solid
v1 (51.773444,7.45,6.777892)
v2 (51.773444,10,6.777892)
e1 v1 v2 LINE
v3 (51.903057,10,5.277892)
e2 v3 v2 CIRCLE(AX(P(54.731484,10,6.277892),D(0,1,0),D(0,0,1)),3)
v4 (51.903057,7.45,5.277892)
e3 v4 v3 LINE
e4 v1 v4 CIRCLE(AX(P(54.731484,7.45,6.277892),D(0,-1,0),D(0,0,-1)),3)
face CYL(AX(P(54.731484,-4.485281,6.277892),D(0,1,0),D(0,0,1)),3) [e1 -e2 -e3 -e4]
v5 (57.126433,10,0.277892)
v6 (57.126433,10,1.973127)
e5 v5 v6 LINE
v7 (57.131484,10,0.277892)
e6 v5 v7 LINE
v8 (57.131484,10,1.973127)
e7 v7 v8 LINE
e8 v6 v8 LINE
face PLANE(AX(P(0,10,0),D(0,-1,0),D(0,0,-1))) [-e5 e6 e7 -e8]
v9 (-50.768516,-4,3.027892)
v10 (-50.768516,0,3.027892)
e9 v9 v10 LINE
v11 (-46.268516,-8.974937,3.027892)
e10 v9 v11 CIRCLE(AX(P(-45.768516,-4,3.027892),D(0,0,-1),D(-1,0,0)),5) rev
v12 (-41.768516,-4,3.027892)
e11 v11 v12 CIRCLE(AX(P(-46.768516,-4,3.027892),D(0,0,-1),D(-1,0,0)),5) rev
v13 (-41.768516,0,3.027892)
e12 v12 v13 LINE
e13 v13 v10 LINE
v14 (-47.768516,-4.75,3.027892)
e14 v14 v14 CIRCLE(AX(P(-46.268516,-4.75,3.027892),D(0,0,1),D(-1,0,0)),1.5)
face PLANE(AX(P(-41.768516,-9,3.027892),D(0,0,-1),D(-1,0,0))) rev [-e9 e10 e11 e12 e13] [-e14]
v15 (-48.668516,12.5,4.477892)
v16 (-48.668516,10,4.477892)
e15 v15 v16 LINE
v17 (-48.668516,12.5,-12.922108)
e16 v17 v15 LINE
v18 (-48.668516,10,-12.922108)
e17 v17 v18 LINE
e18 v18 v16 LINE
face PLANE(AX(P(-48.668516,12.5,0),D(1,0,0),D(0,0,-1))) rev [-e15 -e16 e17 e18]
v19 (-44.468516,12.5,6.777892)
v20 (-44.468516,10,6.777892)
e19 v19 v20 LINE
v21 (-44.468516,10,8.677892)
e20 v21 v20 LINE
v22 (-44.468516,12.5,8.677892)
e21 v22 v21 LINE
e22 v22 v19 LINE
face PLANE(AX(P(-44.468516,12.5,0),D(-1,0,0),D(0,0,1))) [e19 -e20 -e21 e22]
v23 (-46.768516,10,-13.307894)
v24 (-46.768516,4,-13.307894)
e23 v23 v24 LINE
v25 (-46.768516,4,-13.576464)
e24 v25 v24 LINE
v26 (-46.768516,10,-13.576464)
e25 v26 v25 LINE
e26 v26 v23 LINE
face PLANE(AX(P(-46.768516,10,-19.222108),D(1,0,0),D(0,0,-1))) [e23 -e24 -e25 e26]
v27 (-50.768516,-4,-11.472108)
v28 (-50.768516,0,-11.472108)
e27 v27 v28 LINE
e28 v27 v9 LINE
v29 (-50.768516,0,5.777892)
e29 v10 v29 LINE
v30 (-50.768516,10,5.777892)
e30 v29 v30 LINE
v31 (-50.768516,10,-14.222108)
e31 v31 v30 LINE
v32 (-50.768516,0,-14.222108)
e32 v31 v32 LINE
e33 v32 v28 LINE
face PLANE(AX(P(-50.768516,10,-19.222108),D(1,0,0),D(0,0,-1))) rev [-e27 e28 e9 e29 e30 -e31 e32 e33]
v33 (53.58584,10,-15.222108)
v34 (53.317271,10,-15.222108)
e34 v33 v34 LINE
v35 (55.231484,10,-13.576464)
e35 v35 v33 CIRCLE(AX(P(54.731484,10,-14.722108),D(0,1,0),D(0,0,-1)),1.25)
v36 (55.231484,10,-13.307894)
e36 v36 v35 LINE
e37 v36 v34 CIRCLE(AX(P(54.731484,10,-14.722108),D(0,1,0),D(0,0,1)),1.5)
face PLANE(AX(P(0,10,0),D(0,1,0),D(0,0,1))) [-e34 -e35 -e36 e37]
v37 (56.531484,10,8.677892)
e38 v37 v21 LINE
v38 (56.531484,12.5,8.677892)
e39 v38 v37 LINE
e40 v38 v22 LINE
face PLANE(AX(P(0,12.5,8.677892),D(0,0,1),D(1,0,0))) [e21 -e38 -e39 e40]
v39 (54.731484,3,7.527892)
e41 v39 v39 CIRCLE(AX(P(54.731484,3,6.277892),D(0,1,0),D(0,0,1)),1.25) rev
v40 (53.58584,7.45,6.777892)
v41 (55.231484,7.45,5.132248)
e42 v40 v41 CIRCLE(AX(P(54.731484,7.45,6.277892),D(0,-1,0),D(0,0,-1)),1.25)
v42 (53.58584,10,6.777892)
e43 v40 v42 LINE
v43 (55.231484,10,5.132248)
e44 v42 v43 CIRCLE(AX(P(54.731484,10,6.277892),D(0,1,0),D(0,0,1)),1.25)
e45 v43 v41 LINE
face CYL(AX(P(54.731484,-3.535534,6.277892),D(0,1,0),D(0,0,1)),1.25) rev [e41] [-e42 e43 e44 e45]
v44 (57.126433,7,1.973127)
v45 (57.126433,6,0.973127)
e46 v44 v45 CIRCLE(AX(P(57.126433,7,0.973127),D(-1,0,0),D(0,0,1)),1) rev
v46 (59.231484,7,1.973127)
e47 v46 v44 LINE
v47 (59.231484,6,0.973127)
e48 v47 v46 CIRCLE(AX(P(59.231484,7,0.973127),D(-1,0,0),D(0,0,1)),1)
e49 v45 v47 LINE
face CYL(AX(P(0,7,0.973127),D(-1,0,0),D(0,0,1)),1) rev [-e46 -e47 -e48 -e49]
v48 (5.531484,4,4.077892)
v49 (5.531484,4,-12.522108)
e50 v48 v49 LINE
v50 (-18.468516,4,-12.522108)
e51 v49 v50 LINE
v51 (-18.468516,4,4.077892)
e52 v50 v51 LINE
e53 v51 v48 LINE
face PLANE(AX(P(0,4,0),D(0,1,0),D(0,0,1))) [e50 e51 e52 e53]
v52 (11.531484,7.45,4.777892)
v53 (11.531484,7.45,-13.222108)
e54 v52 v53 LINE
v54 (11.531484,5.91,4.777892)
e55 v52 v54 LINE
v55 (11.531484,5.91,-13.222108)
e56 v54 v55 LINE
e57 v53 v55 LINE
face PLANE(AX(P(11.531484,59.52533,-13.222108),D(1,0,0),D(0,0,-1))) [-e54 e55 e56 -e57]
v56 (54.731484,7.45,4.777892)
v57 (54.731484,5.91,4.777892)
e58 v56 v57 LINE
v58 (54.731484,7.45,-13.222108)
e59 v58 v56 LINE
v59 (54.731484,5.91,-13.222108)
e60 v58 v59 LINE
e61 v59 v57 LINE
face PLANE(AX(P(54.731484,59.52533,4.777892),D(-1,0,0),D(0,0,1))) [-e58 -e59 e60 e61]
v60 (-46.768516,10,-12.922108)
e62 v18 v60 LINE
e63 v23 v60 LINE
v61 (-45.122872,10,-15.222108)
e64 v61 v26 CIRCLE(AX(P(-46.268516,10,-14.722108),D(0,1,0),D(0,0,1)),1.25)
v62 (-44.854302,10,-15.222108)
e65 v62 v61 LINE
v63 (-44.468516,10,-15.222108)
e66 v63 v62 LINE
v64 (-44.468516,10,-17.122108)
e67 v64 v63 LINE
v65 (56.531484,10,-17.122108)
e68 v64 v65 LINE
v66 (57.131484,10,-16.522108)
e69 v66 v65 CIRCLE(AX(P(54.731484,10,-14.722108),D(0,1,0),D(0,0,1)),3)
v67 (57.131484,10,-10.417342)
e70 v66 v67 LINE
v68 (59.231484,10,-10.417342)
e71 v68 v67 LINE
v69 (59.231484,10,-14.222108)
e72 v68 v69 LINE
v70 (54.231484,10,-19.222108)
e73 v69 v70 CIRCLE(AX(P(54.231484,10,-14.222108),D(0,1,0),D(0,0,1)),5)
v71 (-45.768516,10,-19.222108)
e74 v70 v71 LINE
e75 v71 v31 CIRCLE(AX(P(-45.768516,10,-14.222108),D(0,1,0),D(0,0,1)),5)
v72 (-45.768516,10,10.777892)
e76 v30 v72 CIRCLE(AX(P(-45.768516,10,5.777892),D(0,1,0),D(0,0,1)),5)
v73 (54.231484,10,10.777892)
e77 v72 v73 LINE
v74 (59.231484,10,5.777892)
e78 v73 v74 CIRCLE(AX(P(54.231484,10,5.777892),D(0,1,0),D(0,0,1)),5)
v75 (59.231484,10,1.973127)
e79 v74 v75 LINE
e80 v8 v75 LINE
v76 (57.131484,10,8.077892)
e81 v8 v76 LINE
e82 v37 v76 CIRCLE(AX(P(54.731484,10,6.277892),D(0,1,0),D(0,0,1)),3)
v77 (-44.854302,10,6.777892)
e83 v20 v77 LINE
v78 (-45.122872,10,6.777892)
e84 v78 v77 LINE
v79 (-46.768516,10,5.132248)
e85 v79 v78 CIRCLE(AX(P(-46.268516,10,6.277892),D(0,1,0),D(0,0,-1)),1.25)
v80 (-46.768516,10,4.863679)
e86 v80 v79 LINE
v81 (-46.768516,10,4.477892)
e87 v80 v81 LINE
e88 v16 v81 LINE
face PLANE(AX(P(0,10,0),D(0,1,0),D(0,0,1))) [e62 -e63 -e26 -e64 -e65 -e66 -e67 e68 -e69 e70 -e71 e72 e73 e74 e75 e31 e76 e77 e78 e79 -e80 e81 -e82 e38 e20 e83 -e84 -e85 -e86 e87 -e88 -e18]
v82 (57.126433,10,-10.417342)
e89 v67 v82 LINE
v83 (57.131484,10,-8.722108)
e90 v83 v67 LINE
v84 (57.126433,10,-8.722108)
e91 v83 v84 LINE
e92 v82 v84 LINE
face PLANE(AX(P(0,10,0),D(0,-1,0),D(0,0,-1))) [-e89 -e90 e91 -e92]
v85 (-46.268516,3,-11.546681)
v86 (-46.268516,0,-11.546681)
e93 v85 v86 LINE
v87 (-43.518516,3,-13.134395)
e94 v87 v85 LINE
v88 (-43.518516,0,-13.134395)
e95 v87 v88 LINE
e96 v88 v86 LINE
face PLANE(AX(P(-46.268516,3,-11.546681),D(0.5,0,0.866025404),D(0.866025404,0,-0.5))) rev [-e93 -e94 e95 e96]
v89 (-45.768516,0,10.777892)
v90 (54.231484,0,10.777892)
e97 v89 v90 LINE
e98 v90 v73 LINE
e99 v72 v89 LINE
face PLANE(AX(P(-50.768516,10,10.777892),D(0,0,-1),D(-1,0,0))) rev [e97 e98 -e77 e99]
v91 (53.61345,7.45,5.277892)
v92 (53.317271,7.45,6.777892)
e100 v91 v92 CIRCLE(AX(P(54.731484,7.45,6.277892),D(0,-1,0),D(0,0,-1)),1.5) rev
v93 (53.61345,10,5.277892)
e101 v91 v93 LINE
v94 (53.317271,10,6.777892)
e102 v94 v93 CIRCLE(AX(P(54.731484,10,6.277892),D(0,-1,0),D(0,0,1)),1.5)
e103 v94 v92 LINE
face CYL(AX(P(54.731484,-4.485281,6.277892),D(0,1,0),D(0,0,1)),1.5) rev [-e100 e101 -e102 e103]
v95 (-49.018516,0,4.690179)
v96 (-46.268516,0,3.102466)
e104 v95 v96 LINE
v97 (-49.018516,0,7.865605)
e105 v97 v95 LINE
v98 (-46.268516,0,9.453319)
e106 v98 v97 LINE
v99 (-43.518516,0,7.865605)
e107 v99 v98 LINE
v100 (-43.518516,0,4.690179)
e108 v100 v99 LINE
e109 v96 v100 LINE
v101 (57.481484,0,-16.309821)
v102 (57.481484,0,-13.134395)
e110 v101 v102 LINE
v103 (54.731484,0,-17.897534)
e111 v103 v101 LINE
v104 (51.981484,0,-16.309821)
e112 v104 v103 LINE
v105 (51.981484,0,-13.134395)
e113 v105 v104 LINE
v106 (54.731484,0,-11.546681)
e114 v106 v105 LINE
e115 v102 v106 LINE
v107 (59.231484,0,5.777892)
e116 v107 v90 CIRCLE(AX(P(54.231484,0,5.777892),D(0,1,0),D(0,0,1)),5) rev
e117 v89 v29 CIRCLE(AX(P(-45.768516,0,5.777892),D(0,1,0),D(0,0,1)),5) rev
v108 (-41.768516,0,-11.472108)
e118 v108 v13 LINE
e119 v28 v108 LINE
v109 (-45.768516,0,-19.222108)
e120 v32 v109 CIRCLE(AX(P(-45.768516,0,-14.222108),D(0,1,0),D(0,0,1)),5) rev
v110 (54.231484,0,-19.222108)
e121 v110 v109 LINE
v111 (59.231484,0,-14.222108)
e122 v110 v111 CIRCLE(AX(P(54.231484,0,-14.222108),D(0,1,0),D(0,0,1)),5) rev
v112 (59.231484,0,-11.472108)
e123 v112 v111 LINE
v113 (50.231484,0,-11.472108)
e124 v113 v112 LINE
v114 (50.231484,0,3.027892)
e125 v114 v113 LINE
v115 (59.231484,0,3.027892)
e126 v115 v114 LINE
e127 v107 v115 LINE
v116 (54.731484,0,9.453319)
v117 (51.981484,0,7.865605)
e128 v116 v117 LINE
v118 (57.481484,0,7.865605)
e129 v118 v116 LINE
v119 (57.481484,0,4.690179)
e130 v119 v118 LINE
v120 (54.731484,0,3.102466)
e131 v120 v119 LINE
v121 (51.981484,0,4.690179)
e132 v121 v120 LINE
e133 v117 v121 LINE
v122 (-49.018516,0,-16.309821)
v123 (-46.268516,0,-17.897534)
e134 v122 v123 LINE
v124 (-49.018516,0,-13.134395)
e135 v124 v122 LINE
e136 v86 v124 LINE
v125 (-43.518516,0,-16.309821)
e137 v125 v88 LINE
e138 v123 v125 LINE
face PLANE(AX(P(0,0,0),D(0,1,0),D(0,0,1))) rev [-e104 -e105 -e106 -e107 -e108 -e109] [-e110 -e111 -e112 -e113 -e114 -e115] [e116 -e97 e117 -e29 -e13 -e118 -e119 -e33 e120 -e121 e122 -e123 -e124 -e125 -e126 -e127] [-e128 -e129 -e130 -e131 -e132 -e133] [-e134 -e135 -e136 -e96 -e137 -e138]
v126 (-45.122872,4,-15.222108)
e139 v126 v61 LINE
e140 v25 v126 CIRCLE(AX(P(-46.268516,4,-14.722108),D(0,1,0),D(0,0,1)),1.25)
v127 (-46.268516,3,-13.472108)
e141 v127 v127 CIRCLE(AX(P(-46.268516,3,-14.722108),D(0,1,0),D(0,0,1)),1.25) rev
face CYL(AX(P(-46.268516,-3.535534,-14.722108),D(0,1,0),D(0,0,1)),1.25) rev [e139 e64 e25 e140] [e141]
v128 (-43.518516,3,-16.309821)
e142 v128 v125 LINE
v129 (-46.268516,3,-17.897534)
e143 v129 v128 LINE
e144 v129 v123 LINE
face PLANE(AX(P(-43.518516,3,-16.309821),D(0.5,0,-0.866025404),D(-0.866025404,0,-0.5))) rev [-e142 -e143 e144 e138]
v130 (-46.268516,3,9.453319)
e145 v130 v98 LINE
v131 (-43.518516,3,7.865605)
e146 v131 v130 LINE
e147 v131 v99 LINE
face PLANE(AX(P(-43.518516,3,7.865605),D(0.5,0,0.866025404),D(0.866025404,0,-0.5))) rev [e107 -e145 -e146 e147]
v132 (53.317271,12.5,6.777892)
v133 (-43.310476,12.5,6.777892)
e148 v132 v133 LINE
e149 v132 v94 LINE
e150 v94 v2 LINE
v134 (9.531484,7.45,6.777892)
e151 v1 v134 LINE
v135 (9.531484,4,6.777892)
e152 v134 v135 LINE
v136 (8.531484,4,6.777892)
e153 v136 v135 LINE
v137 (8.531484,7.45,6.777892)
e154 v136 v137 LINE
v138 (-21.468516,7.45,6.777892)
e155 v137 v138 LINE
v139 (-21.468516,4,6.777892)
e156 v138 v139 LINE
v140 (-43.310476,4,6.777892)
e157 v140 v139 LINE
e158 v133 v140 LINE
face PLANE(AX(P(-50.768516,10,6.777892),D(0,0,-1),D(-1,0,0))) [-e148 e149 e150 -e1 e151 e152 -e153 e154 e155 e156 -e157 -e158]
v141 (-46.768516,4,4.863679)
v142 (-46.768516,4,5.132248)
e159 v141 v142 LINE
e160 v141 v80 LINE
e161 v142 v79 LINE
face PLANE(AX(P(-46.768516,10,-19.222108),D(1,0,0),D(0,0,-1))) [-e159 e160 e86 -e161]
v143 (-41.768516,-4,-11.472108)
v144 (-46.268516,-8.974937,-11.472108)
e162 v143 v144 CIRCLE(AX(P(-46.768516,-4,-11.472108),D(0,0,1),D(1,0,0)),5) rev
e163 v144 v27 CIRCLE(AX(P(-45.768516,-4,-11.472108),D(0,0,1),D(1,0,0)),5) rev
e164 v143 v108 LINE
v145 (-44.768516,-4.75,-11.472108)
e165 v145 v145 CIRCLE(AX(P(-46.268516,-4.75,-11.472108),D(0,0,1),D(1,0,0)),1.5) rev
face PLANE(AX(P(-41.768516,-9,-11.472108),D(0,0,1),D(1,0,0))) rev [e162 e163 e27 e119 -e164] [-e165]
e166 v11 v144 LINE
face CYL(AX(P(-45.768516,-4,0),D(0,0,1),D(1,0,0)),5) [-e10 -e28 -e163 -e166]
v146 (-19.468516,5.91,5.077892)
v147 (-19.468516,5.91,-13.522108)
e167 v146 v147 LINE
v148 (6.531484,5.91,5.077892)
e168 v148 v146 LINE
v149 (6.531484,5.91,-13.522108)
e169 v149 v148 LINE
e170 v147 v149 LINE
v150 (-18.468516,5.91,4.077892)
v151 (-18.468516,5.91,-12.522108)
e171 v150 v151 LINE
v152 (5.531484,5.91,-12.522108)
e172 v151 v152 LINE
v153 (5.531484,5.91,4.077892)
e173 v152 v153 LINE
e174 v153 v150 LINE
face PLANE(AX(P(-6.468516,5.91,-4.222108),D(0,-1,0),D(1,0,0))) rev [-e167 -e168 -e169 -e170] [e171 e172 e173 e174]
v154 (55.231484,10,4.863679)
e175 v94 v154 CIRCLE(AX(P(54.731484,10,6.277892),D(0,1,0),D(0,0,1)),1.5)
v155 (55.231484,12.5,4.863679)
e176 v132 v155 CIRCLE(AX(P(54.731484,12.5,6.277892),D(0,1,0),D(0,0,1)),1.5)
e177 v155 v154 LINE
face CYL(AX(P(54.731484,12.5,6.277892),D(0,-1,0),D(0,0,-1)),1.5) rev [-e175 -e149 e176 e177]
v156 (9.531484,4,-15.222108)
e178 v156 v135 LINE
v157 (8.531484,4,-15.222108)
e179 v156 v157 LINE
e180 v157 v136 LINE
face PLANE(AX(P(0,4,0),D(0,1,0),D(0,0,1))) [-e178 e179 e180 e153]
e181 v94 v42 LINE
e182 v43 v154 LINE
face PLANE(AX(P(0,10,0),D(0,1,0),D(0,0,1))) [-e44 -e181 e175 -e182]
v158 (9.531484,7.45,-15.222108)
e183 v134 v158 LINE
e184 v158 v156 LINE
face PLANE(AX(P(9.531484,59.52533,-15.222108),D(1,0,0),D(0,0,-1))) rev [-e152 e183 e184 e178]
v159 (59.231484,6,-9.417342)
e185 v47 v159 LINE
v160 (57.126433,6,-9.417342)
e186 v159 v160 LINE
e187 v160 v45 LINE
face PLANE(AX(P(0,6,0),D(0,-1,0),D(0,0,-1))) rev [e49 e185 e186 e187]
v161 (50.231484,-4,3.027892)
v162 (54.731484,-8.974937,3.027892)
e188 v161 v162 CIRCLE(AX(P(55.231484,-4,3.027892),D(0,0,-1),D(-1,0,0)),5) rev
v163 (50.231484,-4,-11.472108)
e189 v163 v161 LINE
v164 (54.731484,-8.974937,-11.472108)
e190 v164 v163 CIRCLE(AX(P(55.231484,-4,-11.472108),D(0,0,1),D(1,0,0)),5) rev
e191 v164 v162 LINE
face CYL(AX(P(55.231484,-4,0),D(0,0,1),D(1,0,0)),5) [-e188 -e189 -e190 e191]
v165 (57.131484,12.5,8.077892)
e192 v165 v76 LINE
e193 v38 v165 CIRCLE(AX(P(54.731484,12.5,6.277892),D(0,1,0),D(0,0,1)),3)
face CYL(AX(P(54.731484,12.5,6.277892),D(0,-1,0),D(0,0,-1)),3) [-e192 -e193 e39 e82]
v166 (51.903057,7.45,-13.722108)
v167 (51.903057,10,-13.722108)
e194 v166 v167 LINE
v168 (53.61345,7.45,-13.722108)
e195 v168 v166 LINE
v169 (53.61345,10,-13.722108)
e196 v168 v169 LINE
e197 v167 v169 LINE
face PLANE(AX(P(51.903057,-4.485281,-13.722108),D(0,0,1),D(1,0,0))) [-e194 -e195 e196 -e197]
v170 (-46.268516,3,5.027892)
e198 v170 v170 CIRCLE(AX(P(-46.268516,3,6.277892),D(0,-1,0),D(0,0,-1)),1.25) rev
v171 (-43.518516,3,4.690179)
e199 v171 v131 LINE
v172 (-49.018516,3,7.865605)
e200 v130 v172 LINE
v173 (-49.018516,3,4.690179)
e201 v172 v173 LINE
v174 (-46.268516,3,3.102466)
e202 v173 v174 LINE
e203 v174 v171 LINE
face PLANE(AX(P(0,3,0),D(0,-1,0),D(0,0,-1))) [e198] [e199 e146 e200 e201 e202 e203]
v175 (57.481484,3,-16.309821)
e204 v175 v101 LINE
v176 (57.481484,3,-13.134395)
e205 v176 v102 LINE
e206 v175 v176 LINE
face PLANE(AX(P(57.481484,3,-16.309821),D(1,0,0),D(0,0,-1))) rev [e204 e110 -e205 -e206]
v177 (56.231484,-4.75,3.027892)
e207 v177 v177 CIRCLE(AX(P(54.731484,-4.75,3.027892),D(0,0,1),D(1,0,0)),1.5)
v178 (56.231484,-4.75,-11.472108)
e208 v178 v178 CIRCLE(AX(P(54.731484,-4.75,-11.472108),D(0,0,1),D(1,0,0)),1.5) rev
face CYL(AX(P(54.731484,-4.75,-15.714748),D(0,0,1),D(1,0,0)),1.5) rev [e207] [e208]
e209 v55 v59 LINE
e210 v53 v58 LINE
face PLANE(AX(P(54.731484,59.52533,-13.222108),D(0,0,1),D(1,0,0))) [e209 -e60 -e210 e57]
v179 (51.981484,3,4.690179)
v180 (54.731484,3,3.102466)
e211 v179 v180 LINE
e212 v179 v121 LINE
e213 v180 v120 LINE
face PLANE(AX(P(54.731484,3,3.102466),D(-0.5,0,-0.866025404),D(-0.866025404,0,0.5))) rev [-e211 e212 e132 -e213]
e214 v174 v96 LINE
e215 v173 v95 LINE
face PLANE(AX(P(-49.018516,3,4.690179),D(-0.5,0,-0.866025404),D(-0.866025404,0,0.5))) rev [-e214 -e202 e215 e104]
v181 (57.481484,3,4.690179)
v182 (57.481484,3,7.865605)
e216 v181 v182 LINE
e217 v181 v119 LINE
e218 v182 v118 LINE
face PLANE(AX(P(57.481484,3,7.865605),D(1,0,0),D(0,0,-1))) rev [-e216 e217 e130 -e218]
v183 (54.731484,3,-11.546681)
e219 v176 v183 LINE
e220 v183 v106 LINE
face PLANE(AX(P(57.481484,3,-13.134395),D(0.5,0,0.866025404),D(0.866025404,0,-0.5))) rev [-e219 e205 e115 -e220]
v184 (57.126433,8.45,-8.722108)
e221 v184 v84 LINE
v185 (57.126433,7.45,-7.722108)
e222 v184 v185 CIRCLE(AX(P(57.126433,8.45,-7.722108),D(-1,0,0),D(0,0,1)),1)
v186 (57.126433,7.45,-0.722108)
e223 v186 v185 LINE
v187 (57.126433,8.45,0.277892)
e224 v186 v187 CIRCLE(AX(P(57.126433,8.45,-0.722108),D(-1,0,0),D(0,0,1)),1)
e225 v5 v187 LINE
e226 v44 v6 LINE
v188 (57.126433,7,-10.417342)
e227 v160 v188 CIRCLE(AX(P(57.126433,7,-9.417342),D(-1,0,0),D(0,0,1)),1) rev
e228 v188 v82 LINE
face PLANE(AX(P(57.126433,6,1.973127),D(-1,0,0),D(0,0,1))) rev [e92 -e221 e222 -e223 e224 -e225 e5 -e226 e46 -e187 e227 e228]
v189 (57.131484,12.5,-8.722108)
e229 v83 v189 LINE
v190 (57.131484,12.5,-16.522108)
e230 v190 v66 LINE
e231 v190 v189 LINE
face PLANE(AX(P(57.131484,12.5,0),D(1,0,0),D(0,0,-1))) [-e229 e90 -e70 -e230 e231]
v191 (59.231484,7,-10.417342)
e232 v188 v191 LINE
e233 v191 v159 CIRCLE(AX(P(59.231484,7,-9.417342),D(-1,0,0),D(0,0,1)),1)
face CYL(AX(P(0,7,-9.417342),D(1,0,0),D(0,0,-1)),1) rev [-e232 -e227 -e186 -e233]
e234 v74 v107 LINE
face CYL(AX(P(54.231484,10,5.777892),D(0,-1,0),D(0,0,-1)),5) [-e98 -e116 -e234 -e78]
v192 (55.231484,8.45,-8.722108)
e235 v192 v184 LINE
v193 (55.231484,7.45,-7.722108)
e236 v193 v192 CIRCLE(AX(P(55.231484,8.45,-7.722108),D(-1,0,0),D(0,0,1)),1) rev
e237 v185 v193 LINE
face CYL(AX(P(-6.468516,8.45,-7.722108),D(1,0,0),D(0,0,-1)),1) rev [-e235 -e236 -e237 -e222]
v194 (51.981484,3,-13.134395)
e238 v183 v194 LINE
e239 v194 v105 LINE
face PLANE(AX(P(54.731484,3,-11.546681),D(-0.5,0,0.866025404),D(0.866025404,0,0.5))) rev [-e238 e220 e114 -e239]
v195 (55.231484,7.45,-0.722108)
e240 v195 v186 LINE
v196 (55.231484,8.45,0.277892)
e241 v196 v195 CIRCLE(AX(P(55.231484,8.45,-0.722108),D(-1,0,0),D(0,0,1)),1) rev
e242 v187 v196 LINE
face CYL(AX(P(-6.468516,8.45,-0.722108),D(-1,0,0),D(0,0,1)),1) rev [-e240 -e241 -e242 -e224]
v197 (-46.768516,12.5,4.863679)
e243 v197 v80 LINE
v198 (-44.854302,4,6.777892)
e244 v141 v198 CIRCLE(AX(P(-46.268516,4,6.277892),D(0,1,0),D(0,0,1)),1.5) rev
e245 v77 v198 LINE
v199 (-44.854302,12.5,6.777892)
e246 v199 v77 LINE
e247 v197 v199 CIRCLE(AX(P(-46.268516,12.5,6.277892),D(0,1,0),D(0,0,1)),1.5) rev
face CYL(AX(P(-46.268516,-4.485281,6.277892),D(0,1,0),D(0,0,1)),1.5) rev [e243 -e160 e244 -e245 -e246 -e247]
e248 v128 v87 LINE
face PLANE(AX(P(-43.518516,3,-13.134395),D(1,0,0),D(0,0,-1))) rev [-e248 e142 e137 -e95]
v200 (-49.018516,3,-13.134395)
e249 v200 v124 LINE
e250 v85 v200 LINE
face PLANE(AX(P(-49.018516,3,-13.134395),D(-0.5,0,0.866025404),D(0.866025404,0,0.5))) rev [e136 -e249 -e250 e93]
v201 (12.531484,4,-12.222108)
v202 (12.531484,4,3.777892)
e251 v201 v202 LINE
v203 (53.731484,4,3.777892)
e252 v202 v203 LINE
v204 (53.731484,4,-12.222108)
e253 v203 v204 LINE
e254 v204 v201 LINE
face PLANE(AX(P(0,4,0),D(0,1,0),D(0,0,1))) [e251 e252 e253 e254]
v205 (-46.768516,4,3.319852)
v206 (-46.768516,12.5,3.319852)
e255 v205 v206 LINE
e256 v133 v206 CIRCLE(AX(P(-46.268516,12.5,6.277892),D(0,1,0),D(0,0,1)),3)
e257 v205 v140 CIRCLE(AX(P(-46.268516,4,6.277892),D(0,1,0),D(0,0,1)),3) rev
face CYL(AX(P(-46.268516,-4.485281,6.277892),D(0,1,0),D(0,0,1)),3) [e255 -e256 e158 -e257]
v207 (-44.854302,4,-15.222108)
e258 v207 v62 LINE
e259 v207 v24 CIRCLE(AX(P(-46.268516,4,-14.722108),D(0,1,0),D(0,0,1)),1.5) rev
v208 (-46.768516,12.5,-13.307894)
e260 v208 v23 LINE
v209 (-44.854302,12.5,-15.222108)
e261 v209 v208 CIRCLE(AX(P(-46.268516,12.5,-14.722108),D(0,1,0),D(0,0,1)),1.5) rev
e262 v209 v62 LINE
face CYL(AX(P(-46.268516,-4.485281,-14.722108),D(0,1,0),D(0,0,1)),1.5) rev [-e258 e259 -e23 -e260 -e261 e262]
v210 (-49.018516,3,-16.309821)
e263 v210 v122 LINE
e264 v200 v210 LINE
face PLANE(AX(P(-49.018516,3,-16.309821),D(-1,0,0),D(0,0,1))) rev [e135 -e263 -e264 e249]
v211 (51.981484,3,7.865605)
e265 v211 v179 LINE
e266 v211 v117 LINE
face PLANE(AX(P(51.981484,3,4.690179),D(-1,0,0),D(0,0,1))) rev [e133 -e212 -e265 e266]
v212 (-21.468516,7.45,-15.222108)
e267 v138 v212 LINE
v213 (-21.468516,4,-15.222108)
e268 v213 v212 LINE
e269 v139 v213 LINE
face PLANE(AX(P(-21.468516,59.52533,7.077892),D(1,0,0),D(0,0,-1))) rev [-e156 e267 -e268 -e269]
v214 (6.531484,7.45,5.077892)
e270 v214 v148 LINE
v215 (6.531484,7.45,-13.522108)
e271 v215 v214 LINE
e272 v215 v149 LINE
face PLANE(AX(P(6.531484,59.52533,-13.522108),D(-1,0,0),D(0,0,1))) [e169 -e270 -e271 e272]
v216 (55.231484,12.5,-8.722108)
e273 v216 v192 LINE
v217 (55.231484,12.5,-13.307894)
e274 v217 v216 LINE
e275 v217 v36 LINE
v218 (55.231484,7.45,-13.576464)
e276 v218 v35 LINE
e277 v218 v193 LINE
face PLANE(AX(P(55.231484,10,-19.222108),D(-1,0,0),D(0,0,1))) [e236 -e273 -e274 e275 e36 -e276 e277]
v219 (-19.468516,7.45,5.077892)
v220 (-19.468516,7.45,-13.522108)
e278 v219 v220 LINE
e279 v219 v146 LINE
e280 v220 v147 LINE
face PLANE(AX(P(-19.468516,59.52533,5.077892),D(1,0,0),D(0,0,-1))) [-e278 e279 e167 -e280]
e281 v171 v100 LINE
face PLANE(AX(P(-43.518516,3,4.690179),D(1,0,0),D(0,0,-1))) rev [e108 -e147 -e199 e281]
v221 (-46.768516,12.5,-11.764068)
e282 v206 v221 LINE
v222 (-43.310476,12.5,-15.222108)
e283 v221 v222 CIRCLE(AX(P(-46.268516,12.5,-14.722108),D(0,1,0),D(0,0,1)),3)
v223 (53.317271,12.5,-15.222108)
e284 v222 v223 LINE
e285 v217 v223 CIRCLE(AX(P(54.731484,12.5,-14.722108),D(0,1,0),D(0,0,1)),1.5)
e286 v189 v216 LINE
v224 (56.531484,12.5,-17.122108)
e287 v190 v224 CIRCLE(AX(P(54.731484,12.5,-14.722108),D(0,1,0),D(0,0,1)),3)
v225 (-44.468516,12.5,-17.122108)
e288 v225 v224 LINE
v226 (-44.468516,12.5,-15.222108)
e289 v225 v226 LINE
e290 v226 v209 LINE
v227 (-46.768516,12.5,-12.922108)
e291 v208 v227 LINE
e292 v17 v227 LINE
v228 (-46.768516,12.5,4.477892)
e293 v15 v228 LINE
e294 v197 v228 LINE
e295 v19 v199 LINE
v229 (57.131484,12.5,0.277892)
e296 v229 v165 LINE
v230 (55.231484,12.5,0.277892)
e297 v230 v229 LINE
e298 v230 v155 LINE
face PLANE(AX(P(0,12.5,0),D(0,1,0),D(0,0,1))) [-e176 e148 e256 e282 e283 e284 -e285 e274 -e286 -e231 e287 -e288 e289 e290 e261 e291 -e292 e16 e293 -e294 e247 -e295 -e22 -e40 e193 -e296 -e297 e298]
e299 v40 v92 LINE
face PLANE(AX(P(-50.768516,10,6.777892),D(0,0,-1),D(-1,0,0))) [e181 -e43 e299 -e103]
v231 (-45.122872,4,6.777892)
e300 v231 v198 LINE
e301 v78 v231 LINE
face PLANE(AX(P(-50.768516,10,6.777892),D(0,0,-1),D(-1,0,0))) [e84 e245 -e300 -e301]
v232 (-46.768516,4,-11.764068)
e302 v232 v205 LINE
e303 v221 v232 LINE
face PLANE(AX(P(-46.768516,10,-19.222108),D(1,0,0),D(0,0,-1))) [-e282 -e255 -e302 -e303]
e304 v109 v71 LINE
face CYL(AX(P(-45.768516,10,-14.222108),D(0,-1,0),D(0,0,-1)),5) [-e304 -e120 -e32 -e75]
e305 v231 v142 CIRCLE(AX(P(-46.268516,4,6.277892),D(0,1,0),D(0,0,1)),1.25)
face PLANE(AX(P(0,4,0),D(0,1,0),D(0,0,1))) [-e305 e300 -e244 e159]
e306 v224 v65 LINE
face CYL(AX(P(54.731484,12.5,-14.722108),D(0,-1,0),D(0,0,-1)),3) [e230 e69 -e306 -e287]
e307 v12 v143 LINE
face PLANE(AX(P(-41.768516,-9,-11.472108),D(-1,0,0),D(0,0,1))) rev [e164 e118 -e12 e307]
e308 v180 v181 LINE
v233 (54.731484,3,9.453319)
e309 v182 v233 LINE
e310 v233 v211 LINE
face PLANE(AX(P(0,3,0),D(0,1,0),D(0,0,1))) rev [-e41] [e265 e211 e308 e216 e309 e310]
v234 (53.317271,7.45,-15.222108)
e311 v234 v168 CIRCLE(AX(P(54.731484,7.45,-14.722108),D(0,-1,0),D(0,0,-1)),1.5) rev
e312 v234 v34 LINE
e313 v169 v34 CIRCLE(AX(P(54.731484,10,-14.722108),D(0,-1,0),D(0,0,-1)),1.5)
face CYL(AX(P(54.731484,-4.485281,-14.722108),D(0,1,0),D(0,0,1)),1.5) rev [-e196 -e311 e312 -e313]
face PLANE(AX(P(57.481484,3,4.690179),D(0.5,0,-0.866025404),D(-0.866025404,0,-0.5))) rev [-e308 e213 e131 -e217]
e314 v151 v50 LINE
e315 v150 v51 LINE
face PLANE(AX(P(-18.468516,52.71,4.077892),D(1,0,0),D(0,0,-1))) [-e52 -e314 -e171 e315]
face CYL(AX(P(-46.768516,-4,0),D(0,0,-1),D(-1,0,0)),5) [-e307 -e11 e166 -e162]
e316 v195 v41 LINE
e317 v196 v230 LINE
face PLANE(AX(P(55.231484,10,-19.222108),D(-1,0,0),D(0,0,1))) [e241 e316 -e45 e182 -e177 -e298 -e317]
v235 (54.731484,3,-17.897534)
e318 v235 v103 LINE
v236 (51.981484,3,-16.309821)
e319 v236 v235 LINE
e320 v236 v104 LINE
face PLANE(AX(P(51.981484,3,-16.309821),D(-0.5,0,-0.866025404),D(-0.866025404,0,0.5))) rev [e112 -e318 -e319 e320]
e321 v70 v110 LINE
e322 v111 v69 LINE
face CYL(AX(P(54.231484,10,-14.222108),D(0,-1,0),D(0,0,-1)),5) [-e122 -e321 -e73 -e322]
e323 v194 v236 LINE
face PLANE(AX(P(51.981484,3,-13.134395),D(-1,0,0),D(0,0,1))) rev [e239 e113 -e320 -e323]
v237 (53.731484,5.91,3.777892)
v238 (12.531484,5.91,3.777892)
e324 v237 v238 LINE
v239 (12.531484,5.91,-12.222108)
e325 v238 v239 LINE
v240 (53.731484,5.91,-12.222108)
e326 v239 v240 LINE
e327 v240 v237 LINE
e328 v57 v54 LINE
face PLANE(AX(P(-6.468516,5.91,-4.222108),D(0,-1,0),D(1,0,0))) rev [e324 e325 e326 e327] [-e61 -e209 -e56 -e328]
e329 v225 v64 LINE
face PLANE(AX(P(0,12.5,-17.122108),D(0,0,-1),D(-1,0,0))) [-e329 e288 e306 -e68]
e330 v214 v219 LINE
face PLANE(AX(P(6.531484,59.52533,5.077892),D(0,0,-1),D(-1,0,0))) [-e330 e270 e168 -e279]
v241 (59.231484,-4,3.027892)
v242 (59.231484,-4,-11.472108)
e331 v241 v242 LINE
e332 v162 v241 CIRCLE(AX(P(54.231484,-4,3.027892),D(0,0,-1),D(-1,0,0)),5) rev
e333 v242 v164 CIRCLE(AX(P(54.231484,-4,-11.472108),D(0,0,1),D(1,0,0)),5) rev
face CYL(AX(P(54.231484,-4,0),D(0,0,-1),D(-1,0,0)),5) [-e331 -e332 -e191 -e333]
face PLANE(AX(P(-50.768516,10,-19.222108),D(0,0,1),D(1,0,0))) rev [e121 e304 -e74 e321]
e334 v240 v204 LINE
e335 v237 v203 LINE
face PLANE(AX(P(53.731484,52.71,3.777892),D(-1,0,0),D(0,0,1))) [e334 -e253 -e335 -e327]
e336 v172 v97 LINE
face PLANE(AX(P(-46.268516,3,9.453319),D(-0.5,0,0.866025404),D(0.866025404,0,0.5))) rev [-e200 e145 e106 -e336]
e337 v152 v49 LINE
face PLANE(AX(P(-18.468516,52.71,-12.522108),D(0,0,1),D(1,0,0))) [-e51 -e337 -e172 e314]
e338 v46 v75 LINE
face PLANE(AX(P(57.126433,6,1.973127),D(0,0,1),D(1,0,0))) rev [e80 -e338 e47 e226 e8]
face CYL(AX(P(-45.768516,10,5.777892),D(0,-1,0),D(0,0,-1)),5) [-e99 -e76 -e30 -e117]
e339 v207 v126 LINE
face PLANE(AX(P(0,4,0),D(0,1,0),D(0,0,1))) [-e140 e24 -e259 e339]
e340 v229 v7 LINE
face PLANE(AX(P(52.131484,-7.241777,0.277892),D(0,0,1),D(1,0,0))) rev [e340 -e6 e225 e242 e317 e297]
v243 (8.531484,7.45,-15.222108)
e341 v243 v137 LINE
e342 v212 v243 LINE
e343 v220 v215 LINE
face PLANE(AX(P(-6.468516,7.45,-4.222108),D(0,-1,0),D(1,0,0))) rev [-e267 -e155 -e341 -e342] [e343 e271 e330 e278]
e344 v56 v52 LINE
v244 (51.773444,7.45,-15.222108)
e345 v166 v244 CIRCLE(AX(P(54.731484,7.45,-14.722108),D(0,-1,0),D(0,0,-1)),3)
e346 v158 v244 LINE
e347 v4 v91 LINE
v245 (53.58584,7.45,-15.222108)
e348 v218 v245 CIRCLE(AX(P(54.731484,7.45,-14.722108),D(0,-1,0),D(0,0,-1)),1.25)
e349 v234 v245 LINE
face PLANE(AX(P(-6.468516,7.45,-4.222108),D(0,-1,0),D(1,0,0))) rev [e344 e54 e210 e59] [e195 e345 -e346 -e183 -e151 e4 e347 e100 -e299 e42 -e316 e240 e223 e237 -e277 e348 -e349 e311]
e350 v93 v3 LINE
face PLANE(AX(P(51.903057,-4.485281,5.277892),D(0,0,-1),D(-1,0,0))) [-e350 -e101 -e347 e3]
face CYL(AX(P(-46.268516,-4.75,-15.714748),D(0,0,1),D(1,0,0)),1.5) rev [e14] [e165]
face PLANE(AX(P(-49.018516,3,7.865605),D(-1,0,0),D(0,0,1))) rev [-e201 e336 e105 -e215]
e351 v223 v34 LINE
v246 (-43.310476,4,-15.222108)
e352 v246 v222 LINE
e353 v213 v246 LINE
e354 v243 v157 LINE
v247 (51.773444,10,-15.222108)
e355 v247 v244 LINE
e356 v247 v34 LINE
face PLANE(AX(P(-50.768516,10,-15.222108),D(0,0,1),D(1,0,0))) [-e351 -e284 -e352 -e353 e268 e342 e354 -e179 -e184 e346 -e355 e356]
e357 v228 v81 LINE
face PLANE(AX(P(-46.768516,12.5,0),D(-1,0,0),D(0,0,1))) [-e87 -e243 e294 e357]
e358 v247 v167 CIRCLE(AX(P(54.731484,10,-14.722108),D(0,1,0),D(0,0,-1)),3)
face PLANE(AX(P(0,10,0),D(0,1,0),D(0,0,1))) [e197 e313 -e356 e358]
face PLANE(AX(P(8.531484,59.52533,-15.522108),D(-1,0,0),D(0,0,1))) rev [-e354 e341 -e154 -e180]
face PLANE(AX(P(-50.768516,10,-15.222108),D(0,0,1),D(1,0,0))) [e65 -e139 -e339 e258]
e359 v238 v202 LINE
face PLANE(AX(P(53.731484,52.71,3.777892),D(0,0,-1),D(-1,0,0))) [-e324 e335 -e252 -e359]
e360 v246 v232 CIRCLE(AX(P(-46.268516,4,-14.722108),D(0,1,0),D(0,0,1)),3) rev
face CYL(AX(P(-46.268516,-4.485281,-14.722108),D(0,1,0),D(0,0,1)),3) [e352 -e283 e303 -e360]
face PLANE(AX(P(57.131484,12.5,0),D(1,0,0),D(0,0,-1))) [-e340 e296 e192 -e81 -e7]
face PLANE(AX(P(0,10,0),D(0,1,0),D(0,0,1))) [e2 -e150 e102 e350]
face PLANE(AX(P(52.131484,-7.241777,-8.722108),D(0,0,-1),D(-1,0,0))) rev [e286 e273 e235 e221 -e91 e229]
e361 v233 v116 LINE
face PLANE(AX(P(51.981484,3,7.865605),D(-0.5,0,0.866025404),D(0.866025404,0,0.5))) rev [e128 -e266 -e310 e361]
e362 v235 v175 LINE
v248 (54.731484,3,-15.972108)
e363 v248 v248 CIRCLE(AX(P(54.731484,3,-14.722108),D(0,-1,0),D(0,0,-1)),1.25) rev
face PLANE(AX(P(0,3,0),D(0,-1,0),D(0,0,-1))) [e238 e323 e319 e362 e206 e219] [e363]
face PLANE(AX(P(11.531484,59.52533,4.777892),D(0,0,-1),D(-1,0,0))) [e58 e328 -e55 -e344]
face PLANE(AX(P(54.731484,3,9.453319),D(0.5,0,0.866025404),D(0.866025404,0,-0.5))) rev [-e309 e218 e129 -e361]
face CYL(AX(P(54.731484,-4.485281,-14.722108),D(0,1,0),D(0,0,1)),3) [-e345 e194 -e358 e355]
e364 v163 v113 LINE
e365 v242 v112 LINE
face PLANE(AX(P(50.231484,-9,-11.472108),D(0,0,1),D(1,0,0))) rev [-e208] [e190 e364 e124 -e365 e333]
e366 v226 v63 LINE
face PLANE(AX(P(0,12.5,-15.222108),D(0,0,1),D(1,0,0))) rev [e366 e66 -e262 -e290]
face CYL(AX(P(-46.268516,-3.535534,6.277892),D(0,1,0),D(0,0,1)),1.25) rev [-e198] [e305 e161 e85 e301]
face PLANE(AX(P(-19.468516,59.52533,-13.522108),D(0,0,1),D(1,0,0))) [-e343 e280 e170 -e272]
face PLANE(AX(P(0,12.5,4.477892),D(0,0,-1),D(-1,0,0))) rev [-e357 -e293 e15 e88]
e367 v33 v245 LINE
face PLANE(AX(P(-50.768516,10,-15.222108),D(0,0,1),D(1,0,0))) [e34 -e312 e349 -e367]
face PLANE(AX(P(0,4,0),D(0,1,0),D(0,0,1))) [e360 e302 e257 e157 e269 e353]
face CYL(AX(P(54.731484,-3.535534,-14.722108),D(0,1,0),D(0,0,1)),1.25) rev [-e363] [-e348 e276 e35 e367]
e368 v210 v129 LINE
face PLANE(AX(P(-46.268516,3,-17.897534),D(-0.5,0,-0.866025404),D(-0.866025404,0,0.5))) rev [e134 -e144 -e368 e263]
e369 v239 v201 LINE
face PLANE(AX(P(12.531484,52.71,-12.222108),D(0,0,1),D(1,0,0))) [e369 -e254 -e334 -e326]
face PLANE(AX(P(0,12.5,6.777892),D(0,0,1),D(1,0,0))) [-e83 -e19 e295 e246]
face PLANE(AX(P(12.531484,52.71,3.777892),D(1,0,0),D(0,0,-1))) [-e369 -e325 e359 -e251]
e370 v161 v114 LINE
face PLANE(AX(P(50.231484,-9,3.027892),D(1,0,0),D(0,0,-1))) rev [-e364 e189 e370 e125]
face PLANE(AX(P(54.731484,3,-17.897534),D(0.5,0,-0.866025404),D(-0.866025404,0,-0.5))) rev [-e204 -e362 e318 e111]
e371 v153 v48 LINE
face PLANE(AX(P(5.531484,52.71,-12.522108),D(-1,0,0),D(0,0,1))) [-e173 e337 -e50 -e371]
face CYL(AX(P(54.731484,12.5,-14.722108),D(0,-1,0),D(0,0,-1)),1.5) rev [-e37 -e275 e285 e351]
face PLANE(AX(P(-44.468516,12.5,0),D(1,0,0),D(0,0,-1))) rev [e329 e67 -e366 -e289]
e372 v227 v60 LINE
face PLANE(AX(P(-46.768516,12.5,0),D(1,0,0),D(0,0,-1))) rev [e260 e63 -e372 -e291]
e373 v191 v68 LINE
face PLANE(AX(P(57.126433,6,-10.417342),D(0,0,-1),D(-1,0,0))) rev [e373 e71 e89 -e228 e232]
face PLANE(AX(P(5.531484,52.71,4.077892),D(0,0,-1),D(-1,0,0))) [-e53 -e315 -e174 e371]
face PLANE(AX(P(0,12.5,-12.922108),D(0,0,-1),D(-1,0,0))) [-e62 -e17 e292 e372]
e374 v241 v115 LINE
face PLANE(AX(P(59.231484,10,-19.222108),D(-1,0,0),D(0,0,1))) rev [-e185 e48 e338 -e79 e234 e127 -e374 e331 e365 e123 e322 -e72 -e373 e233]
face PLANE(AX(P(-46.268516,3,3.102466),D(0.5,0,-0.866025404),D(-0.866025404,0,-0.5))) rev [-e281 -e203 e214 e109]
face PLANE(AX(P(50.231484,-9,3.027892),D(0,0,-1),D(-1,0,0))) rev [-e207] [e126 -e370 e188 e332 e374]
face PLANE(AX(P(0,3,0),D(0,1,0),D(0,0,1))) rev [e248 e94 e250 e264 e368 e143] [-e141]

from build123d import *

# Parameters (mm, degrees)
SKETCH1_W           = 110
SKETCH1_H           = 30
BOSS_EXTRUDE1_DEPTH = 10
SHELL1_T            = -4
SKETCH2_W           = 30
SKETCH2_H           = 22.6
SKETCH2_W_2         = 26
SKETCH2_H_2         = 18.6
SKETCH2_W_3         = 47.2
SKETCH2_H_3         = 22
SKETCH2_W_4         = 43.2
SKETCH2_H_4         = 18
BOSS_EXTRUDE2_DEPTH = 3.45
SKETCH3_W           = 26
SKETCH3_H           = 18.6
SKETCH3_W_2         = 24
SKETCH3_H_2         = 16.6
SKETCH3_W_3         = 43.2
SKETCH3_H_3         = 18
SKETCH3_W_4         = 41.2
SKETCH3_H_4         = 16
BOSS_EXTRUDE3_DEPTH = 1.91
BOSS_EXTRUDE4_REACH = 65.07
SKETCH4_R           = 3
SKETCH4_R_2         = 1.5
CUT_EXTRUDE4_REACH  = 65.07
SKETCH5_R           = 1.25
BOSS_EXTRUDE5_START = 2.5
BOSS_EXTRUDE5_DEPTH = 2.5
CUT_EXTRUDE7_DEPTH  = 3
CUT_EXTRUDE8_START  = -5.05
SKETCH9_W           = 11.612420809
SKETCH9_H           = 9
CUT_EXTRUDE8_DEPTH  = 5.05
SKETCH10_W          = 2.105051461
SKETCH10_H          = 12.390469158
CUT_EXTRUDE9_DEPTH  = 4
FILLET1_R           = 5
FILLET2_R           = 1
SKETCH11_W          = 9
SKETCH11_H          = 14.5
BOSS_EXTRUDE6_DEPTH = 9
SKETCH12_R          = 1.5
CUT_EXTRUDE10_DEPTH = 14.5
FILLET3_R           = 5


with BuildPart() as part:
    # Sketch1 → Boss-Extrude1 (new body)
    with BuildSketch(Plane(origin=(0, 0, 0), x_dir=(1, 0, 0), z_dir=(0, 1, 0))):
        with Locations((4.231484391, 4.222107765)):
            Rectangle(SKETCH1_W, SKETCH1_H)
    extrude(amount=BOSS_EXTRUDE1_DEPTH)

    # Shell1
    shell1_openings = [part.faces().sort_by_distance(p)[0] for p in [
        (4.231484391, 10, -4.222107765),
    ]]
    offset(amount=SHELL1_T, openings=shell1_openings, kind=Kind.INTERSECTION)

    # Sketch2 → Boss-Extrude2 (add)
    # profile 1 of 2: a face of its own
    with BuildSketch(Plane(origin=(0, 4, 0), x_dir=(1, 0, 0), z_dir=(0, 1, 0))):
        with Locations((-6.468515609, 4.222107765)):
            Rectangle(SKETCH2_W, SKETCH2_H)
        with Locations((-6.468515609, 4.222107765)):
            Rectangle(SKETCH2_W_2, SKETCH2_H_2, mode=Mode.SUBTRACT)
    # profile 2 of 2: a face of its own
    with BuildSketch(Plane(origin=(0, 4, 0), x_dir=(1, 0, 0), z_dir=(0, 1, 0))):
        with Locations((33.131484391, 4.222107765)):
            Rectangle(SKETCH2_W_3, SKETCH2_H_3)
        with Locations((33.131484391, 4.222107765)):
            Rectangle(SKETCH2_W_4, SKETCH2_H_4, mode=Mode.SUBTRACT)
    extrude(amount=BOSS_EXTRUDE2_DEPTH)

    # Sketch3 → Boss-Extrude3 (add)
    # profile 1 of 2: a face of its own
    with BuildSketch(Plane(origin=(0, 4, 0), x_dir=(1, 0, 0), z_dir=(0, 1, 0))):
        with Locations((-6.468515609, 4.222107765)):
            Rectangle(SKETCH3_W, SKETCH3_H)
        with Locations((-6.468515609, 4.222107765)):
            Rectangle(SKETCH3_W_2, SKETCH3_H_2, mode=Mode.SUBTRACT)
    # profile 2 of 2: a face of its own
    with BuildSketch(Plane(origin=(0, 4, 0), x_dir=(1, 0, 0), z_dir=(0, 1, 0))):
        with Locations((33.131484391, 4.222107765)):
            Rectangle(SKETCH3_W_3, SKETCH3_H_3)
        with Locations((33.131484391, 4.222107765)):
            Rectangle(SKETCH3_W_4, SKETCH3_H_4, mode=Mode.SUBTRACT)
    extrude(amount=BOSS_EXTRUDE3_DEPTH)

    # Boss-Extrude4: up to this face of the body (flat: up to its plane)
    boss_extrude4_end = Plane(part.part.faces().sort_by_distance((-34.118515609, 4, -4.222107765))[0])
    # Sketch4 → Boss-Extrude4 (add, up to the picked face)
    with BuildSketch(Plane(origin=(0, 10, 0), x_dir=(1, 0, 0), z_dir=(0, 1, 0)), mode=Mode.PRIVATE) as boss_extrude4_sk1:
        with Locations((-46.268515609, -6.277892235)):
            Circle(SKETCH4_R)
        with Locations((-46.268515609, -6.277892235)):
            Circle(SKETCH4_R_2, mode=Mode.SUBTRACT)
    boss_extrude4_tool1 = split(extrude(boss_extrude4_sk1.sketch, amount=-BOSS_EXTRUDE4_REACH, mode=Mode.PRIVATE), bisect_by=boss_extrude4_end, keep=Keep.BOTH, mode=Mode.PRIVATE)
    # Sketch4 → Boss-Extrude4 (add, up to the picked face)
    with BuildSketch(Plane(origin=(0, 10, 0), x_dir=(1, 0, 0), z_dir=(0, 1, 0)), mode=Mode.PRIVATE) as boss_extrude4_sk2:
        with Locations((-46.268515609, 14.722107765)):
            Circle(SKETCH4_R)
        with Locations((-46.268515609, 14.722107765)):
            Circle(SKETCH4_R_2, mode=Mode.SUBTRACT)
    boss_extrude4_tool2 = split(extrude(boss_extrude4_sk2.sketch, amount=-BOSS_EXTRUDE4_REACH, mode=Mode.PRIVATE), bisect_by=boss_extrude4_end, keep=Keep.BOTH, mode=Mode.PRIVATE)
    # Sketch4 → Boss-Extrude4 (add, up to the picked face)
    with BuildSketch(Plane(origin=(0, 10, 0), x_dir=(1, 0, 0), z_dir=(0, 1, 0)), mode=Mode.PRIVATE) as boss_extrude4_sk3:
        with BuildLine():
            Line((55.231484391, 11.764067874), (55.231484391, 13.307894203))
            ThreePointArc((55.231484391, 13.307894203), (55.103485361, 16.175247565), (53.613450402, 13.722107765))
            Line((53.613450402, 13.722107765), (51.903057266, 13.722107765))
            ThreePointArc((51.903057266, 13.722107765), (56.252626486, 17.307862341), (55.231484391, 11.764067874))
        make_face()
    boss_extrude4_tool3 = split(extrude(boss_extrude4_sk3.sketch, amount=-BOSS_EXTRUDE4_REACH, mode=Mode.PRIVATE), bisect_by=boss_extrude4_end, keep=Keep.BOTH, mode=Mode.PRIVATE)
    # Sketch4 → Boss-Extrude4 (add, up to the picked face)
    with BuildSketch(Plane(origin=(0, 10, 0), x_dir=(1, 0, 0), z_dir=(0, 1, 0)), mode=Mode.PRIVATE) as boss_extrude4_sk4:
        with BuildLine():
            Line((51.903057266, -5.277892235), (53.613450402, -5.277892235))
            ThreePointArc((53.613450402, -5.277892235), (55.103485361, -7.731032035), (55.231484391, -4.863678672))
            Line((55.231484391, -4.863678672), (55.231484391, -3.319852343))
            ThreePointArc((55.231484391, -3.319852343), (56.252626486, -8.86364681), (51.903057266, -5.277892235))
        make_face()
    boss_extrude4_tool4 = split(extrude(boss_extrude4_sk4.sketch, amount=-BOSS_EXTRUDE4_REACH, mode=Mode.PRIVATE), bisect_by=boss_extrude4_end, keep=Keep.BOTH, mode=Mode.PRIVATE)
    add(boss_extrude4_tool1.solids().sort_by(Axis((-49.183663, 10, 6.277892), (0, -1, 0)))[0])
    add(boss_extrude4_tool2.solids().sort_by(Axis((-49.183663, 10, -14.722108), (0, -1, 0)))[0])
    add(boss_extrude4_tool3.solids().sort_by(Axis((56.209752, 10, -17.234981), (0, -1, 0)))[0])
    add(boss_extrude4_tool4.solids().sort_by(Axis((52.758254, 10, 5.362449), (0, -1, 0)))[0])

    # Cut-Extrude4: up to this face of the body (flat: up to its plane)
    cut_extrude4_end = Plane(part.part.faces().sort_by_distance((4.231484391, 0, -4.222107765))[0])
    # Sketch5 → Cut-Extrude4 (cut, up to the picked face)
    with BuildSketch(Plane(origin=(0, 10, 0), x_dir=(1, 0, 0), z_dir=(0, 1, 0)), mode=Mode.PRIVATE) as cut_extrude4_sk1:
        with Locations(Location((-46.268515609, 14.722107765, 0), (0, 0, 270))):
            Circle(SKETCH5_R)
    cut_extrude4_tool1 = split(extrude(cut_extrude4_sk1.sketch, amount=-CUT_EXTRUDE4_REACH, mode=Mode.PRIVATE), bisect_by=cut_extrude4_end, keep=Keep.BOTH, mode=Mode.PRIVATE)
    # Sketch5 → Cut-Extrude4 (cut, up to the picked face)
    with BuildSketch(Plane(origin=(0, 10, 0), x_dir=(1, 0, 0), z_dir=(0, 1, 0)), mode=Mode.PRIVATE) as cut_extrude4_sk2:
        with Locations(Location((-46.268515609, -6.277892235, 0), (0, 0, 270))):
            Circle(SKETCH5_R)
    cut_extrude4_tool2 = split(extrude(cut_extrude4_sk2.sketch, amount=-CUT_EXTRUDE4_REACH, mode=Mode.PRIVATE), bisect_by=cut_extrude4_end, keep=Keep.BOTH, mode=Mode.PRIVATE)
    # Sketch5 → Cut-Extrude4 (cut, up to the picked face)
    with BuildSketch(Plane(origin=(0, 10, 0), x_dir=(1, 0, 0), z_dir=(0, 1, 0)), mode=Mode.PRIVATE) as cut_extrude4_sk3:
        with Locations(Location((54.731484391, -6.277892235, 0), (0, 0, 270))):
            Circle(SKETCH5_R)
    cut_extrude4_tool3 = split(extrude(cut_extrude4_sk3.sketch, amount=-CUT_EXTRUDE4_REACH, mode=Mode.PRIVATE), bisect_by=cut_extrude4_end, keep=Keep.BOTH, mode=Mode.PRIVATE)
    # Sketch5 → Cut-Extrude4 (cut, up to the picked face)
    with BuildSketch(Plane(origin=(0, 10, 0), x_dir=(1, 0, 0), z_dir=(0, 1, 0)), mode=Mode.PRIVATE) as cut_extrude4_sk4:
        with Locations(Location((54.731484391, 14.722107765, 0), (0, 0, 270))):
            Circle(SKETCH5_R)
    cut_extrude4_tool4 = split(extrude(cut_extrude4_sk4.sketch, amount=-CUT_EXTRUDE4_REACH, mode=Mode.PRIVATE), bisect_by=cut_extrude4_end, keep=Keep.BOTH, mode=Mode.PRIVATE)
    add(cut_extrude4_tool1.solids().sort_by(Axis((-46.268516, 10, -14.722108), (0, -1, 0)))[0], mode=Mode.SUBTRACT)
    add(cut_extrude4_tool2.solids().sort_by(Axis((-46.268516, 10, 6.277892), (0, -1, 0)))[0], mode=Mode.SUBTRACT)
    add(cut_extrude4_tool3.solids().sort_by(Axis((54.731484, 10, 6.277892), (0, -1, 0)))[0], mode=Mode.SUBTRACT)
    add(cut_extrude4_tool4.solids().sort_by(Axis((54.731484, 10, -14.722108), (0, -1, 0)))[0], mode=Mode.SUBTRACT)

    # Sketch7 → Boss-Extrude5 (add)
    with BuildSketch(Plane(origin=(0, 10, 0), x_dir=(1, 0, 0), z_dir=(0, 1, 0)).offset(BOSS_EXTRUDE5_START)):
        with BuildLine():
            ThreePointArc((-44.854302047, 15.222107765), (-45.207855437, 13.661447594), (-46.768515609, 13.307894203))
            Line((-46.768515609, 13.307894203), (-46.768515609, 12.922107765))
            Line((-46.768515609, 12.922107765), (-48.668515609, 12.922107765))
            Line((-48.668515609, 12.922107765), (-48.668515609, -3.319852343))
            Line((-48.668515609, -3.319852343), (-48.668515609, -4.477892235))
            Line((-48.668515609, -4.477892235), (-46.768515609, -4.477892235))
            Line((-46.768515609, -4.477892235), (-46.768515609, -4.863678672))
            ThreePointArc((-46.768515609, -4.863678672), (-45.207855437, -5.217232063), (-44.854302047, -6.777892235))
            Line((-44.854302047, -6.777892235), (-44.468515609, -6.777892235))
            Line((-44.468515609, -6.777892235), (-44.468515609, -8.677892235))
            Line((-44.468515609, -8.677892235), (-43.310475718, -8.677892235))
            Line((-43.310475718, -8.677892235), (51.773444499, -8.677892235))
            Line((51.773444499, -8.677892235), (52.931484391, -8.677892235))
            Line((52.931484391, -8.677892235), (56.531484391, -8.677892235))
            ThreePointArc((56.531484391, -8.677892235), (56.852804734, -8.399212578), (57.131484391, -8.077892235))
            Line((57.131484391, -8.077892235), (57.131484391, -5.132248311))
            Line((57.131484391, -5.132248311), (57.131484391, 13.576463842))
            Line((57.131484391, 13.576463842), (57.131484391, 16.522107765))
            ThreePointArc((57.131484391, 16.522107765), (56.852804734, 16.843428109), (56.531484391, 17.122107765))
            Line((56.531484391, 17.122107765), (51.773444499, 17.122107765))
            Line((51.773444499, 17.122107765), (-44.468515609, 17.122107765))
            Line((-44.468515609, 17.122107765), (-44.468515609, 15.222107765))
            Line((-44.468515609, 15.222107765), (-44.854302047, 15.222107765))
        make_face()
        with BuildLine():
            Line((53.317270829, -6.777892235), (51.773444499, -6.777892235))
            Line((51.773444499, -6.777892235), (-43.310475718, -6.777892235))
            ThreePointArc((-43.310475718, -6.777892235), (-44.147195266, -4.156571891), (-46.768515609, -3.319852343))
            Line((-46.768515609, -3.319852343), (-46.768515609, 11.764067874))
            ThreePointArc((-46.768515609, 11.764067874), (-44.147195266, 12.600787422), (-43.310475718, 15.222107765))
            Line((-43.310475718, 15.222107765), (51.773444499, 15.222107765))
            Line((51.773444499, 15.222107765), (53.317270829, 15.222107765))
            ThreePointArc((53.317270829, 15.222107765), (55.792144563, 15.782767937), (55.231484391, 13.307894203))
            Line((55.231484391, 13.307894203), (55.231484391, -4.863678672))
            ThreePointArc((55.231484391, -4.863678672), (55.792144563, -7.338552406), (53.317270829, -6.777892235))
        make_face(mode=Mode.SUBTRACT)
    extrude(amount=-BOSS_EXTRUDE5_DEPTH)

    # Sketch8 → Cut-Extrude7 (cut)
    with BuildSketch(Plane.XZ):
        Polygon((-43.518515609, -13.134394525), (-43.518515609, -16.309821006), (-46.268515609, -17.897534246), (-49.018515609, -16.309821006), (-49.018515609, -13.134394525), (-46.268515609, -11.546681285), align=None)
        Polygon((-43.518515609, 7.865605475), (-46.268515609, 9.453318715), (-49.018515609, 7.865605475), (-49.018515609, 4.690178994), (-46.268515609, 3.102465754), (-43.518515609, 4.690178994), align=None)
        Polygon((51.981484391, -16.309821006), (54.731484391, -17.897534246), (57.481484391, -16.309821006), (57.481484391, -13.134394525), (54.731484391, -11.546681285), (51.981484391, -13.134394525), align=None)
        Polygon((51.981484391, 4.690178994), (51.981484391, 7.865605475), (54.731484391, 9.453318715), (57.481484391, 7.865605475), (57.481484391, 4.690178994), (54.731484391, 3.102465754), align=None)
    extrude(amount=-CUT_EXTRUDE7_DEPTH, mode=Mode.SUBTRACT)

    # Sketch9 → Cut-Extrude8 (cut)
    with BuildSketch(Plane(origin=(0, 12.5, 0), x_dir=(1, 0, 0), z_dir=(0, 1, 0)).offset(CUT_EXTRUDE8_START)):
        with Locations((57.937694796, 4.222107765)):
            Rectangle(SKETCH9_W, SKETCH9_H)
    extrude(amount=CUT_EXTRUDE8_DEPTH, mode=Mode.SUBTRACT)

    # Sketch10 → Cut-Extrude9 (cut)
    with BuildSketch(Plane(origin=(0, 10, 0), x_dir=(1, 0, 0), z_dir=(0, 1, 0))):
        with Locations((58.178958661, 4.222107765)):
            Rectangle(SKETCH10_W, SKETCH10_H)
    extrude(amount=-CUT_EXTRUDE9_DEPTH, mode=Mode.SUBTRACT)

    # Fillet1
    fillet1_edges = [part.edges().sort_by_distance(p)[0] for p in [
        (-50.768515609, 5, -19.222107765),
        (59.231484391, 5, -19.222107765),
        (59.231484391, 5, 10.777892235),
        (-50.768515609, 5, 10.777892235),
    ]]
    fillet(fillet1_edges, radius=FILLET1_R)

    # Fillet2
    fillet2_edges = [part.edges().sort_by_distance(p)[0] for p in [
        (56.178958661, 7.45, 0.277892235),
        (56.178958661, 7.45, -8.722107765),
        (58.178958661, 6, 1.973126814),
        (58.178958661, 6, -10.417342344),
    ]]
    fillet(fillet2_edges, radius=FILLET2_R)

    # Sketch11 → Boss-Extrude6 (add)
    with BuildSketch(Plane(origin=(0, 0, 0), x_dir=(-1, 0, 0), z_dir=(0, -1, 0))):
        with Locations((-54.731484391, 4.222107765)):
            Rectangle(SKETCH11_W, SKETCH11_H)
        with Locations((46.268515609, 4.222107765)):
            Rectangle(SKETCH11_W, SKETCH11_H)
    extrude(amount=BOSS_EXTRUDE6_DEPTH)

    # Sketch12 → Cut-Extrude10 (cut)
    with BuildSketch(Plane.XY.offset(3.027892235)):
        with Locations((54.731484391, -4.75)):
            Circle(SKETCH12_R)
        with Locations((-46.268515609, -4.75)):
            Circle(SKETCH12_R)
    extrude(amount=-CUT_EXTRUDE10_DEPTH, mode=Mode.SUBTRACT)

    # Fillet3
    # the kernel refuses this fillet: 5 mm, written as the material it takes off along each edge
    with BuildSketch(Plane(origin=(-50.768515609, -9, 15.527892235), x_dir=(0, 1, 0), z_dir=(0, 0, -1)), Plane(origin=(50.231484391, -9, -23.972107765), x_dir=(1, 0, 0), z_dir=(0, 0, 1)), Plane(origin=(-41.768515609, -9, -23.972107765), x_dir=(0, 1, 0), z_dir=(0, 0, 1))) as fillet3_piece_1:
        with BuildLine():
            CenterArc((FILLET3_R, FILLET3_R), FILLET3_R, 180, 90)
            Line((0, FILLET3_R), (0, 0))
            Line((0, 0), (FILLET3_R, 0))
        make_face()
    extrude(amount=39.5, mode=Mode.SUBTRACT)
    with BuildSketch(Plane(origin=(59.231484391, -9, 15.527892235), x_dir=(0, 1, 0), z_dir=(0, 0, -1))) as fillet3_piece_2:
        with BuildLine():
            CenterArc((FILLET3_R, -FILLET3_R), FILLET3_R, 90, 90)
            Line((0, -FILLET3_R), (0, 0))
            Line((0, 0), (FILLET3_R, 0))
        make_face()
    extrude(amount=39.5, mode=Mode.SUBTRACT)


solid = part.part
